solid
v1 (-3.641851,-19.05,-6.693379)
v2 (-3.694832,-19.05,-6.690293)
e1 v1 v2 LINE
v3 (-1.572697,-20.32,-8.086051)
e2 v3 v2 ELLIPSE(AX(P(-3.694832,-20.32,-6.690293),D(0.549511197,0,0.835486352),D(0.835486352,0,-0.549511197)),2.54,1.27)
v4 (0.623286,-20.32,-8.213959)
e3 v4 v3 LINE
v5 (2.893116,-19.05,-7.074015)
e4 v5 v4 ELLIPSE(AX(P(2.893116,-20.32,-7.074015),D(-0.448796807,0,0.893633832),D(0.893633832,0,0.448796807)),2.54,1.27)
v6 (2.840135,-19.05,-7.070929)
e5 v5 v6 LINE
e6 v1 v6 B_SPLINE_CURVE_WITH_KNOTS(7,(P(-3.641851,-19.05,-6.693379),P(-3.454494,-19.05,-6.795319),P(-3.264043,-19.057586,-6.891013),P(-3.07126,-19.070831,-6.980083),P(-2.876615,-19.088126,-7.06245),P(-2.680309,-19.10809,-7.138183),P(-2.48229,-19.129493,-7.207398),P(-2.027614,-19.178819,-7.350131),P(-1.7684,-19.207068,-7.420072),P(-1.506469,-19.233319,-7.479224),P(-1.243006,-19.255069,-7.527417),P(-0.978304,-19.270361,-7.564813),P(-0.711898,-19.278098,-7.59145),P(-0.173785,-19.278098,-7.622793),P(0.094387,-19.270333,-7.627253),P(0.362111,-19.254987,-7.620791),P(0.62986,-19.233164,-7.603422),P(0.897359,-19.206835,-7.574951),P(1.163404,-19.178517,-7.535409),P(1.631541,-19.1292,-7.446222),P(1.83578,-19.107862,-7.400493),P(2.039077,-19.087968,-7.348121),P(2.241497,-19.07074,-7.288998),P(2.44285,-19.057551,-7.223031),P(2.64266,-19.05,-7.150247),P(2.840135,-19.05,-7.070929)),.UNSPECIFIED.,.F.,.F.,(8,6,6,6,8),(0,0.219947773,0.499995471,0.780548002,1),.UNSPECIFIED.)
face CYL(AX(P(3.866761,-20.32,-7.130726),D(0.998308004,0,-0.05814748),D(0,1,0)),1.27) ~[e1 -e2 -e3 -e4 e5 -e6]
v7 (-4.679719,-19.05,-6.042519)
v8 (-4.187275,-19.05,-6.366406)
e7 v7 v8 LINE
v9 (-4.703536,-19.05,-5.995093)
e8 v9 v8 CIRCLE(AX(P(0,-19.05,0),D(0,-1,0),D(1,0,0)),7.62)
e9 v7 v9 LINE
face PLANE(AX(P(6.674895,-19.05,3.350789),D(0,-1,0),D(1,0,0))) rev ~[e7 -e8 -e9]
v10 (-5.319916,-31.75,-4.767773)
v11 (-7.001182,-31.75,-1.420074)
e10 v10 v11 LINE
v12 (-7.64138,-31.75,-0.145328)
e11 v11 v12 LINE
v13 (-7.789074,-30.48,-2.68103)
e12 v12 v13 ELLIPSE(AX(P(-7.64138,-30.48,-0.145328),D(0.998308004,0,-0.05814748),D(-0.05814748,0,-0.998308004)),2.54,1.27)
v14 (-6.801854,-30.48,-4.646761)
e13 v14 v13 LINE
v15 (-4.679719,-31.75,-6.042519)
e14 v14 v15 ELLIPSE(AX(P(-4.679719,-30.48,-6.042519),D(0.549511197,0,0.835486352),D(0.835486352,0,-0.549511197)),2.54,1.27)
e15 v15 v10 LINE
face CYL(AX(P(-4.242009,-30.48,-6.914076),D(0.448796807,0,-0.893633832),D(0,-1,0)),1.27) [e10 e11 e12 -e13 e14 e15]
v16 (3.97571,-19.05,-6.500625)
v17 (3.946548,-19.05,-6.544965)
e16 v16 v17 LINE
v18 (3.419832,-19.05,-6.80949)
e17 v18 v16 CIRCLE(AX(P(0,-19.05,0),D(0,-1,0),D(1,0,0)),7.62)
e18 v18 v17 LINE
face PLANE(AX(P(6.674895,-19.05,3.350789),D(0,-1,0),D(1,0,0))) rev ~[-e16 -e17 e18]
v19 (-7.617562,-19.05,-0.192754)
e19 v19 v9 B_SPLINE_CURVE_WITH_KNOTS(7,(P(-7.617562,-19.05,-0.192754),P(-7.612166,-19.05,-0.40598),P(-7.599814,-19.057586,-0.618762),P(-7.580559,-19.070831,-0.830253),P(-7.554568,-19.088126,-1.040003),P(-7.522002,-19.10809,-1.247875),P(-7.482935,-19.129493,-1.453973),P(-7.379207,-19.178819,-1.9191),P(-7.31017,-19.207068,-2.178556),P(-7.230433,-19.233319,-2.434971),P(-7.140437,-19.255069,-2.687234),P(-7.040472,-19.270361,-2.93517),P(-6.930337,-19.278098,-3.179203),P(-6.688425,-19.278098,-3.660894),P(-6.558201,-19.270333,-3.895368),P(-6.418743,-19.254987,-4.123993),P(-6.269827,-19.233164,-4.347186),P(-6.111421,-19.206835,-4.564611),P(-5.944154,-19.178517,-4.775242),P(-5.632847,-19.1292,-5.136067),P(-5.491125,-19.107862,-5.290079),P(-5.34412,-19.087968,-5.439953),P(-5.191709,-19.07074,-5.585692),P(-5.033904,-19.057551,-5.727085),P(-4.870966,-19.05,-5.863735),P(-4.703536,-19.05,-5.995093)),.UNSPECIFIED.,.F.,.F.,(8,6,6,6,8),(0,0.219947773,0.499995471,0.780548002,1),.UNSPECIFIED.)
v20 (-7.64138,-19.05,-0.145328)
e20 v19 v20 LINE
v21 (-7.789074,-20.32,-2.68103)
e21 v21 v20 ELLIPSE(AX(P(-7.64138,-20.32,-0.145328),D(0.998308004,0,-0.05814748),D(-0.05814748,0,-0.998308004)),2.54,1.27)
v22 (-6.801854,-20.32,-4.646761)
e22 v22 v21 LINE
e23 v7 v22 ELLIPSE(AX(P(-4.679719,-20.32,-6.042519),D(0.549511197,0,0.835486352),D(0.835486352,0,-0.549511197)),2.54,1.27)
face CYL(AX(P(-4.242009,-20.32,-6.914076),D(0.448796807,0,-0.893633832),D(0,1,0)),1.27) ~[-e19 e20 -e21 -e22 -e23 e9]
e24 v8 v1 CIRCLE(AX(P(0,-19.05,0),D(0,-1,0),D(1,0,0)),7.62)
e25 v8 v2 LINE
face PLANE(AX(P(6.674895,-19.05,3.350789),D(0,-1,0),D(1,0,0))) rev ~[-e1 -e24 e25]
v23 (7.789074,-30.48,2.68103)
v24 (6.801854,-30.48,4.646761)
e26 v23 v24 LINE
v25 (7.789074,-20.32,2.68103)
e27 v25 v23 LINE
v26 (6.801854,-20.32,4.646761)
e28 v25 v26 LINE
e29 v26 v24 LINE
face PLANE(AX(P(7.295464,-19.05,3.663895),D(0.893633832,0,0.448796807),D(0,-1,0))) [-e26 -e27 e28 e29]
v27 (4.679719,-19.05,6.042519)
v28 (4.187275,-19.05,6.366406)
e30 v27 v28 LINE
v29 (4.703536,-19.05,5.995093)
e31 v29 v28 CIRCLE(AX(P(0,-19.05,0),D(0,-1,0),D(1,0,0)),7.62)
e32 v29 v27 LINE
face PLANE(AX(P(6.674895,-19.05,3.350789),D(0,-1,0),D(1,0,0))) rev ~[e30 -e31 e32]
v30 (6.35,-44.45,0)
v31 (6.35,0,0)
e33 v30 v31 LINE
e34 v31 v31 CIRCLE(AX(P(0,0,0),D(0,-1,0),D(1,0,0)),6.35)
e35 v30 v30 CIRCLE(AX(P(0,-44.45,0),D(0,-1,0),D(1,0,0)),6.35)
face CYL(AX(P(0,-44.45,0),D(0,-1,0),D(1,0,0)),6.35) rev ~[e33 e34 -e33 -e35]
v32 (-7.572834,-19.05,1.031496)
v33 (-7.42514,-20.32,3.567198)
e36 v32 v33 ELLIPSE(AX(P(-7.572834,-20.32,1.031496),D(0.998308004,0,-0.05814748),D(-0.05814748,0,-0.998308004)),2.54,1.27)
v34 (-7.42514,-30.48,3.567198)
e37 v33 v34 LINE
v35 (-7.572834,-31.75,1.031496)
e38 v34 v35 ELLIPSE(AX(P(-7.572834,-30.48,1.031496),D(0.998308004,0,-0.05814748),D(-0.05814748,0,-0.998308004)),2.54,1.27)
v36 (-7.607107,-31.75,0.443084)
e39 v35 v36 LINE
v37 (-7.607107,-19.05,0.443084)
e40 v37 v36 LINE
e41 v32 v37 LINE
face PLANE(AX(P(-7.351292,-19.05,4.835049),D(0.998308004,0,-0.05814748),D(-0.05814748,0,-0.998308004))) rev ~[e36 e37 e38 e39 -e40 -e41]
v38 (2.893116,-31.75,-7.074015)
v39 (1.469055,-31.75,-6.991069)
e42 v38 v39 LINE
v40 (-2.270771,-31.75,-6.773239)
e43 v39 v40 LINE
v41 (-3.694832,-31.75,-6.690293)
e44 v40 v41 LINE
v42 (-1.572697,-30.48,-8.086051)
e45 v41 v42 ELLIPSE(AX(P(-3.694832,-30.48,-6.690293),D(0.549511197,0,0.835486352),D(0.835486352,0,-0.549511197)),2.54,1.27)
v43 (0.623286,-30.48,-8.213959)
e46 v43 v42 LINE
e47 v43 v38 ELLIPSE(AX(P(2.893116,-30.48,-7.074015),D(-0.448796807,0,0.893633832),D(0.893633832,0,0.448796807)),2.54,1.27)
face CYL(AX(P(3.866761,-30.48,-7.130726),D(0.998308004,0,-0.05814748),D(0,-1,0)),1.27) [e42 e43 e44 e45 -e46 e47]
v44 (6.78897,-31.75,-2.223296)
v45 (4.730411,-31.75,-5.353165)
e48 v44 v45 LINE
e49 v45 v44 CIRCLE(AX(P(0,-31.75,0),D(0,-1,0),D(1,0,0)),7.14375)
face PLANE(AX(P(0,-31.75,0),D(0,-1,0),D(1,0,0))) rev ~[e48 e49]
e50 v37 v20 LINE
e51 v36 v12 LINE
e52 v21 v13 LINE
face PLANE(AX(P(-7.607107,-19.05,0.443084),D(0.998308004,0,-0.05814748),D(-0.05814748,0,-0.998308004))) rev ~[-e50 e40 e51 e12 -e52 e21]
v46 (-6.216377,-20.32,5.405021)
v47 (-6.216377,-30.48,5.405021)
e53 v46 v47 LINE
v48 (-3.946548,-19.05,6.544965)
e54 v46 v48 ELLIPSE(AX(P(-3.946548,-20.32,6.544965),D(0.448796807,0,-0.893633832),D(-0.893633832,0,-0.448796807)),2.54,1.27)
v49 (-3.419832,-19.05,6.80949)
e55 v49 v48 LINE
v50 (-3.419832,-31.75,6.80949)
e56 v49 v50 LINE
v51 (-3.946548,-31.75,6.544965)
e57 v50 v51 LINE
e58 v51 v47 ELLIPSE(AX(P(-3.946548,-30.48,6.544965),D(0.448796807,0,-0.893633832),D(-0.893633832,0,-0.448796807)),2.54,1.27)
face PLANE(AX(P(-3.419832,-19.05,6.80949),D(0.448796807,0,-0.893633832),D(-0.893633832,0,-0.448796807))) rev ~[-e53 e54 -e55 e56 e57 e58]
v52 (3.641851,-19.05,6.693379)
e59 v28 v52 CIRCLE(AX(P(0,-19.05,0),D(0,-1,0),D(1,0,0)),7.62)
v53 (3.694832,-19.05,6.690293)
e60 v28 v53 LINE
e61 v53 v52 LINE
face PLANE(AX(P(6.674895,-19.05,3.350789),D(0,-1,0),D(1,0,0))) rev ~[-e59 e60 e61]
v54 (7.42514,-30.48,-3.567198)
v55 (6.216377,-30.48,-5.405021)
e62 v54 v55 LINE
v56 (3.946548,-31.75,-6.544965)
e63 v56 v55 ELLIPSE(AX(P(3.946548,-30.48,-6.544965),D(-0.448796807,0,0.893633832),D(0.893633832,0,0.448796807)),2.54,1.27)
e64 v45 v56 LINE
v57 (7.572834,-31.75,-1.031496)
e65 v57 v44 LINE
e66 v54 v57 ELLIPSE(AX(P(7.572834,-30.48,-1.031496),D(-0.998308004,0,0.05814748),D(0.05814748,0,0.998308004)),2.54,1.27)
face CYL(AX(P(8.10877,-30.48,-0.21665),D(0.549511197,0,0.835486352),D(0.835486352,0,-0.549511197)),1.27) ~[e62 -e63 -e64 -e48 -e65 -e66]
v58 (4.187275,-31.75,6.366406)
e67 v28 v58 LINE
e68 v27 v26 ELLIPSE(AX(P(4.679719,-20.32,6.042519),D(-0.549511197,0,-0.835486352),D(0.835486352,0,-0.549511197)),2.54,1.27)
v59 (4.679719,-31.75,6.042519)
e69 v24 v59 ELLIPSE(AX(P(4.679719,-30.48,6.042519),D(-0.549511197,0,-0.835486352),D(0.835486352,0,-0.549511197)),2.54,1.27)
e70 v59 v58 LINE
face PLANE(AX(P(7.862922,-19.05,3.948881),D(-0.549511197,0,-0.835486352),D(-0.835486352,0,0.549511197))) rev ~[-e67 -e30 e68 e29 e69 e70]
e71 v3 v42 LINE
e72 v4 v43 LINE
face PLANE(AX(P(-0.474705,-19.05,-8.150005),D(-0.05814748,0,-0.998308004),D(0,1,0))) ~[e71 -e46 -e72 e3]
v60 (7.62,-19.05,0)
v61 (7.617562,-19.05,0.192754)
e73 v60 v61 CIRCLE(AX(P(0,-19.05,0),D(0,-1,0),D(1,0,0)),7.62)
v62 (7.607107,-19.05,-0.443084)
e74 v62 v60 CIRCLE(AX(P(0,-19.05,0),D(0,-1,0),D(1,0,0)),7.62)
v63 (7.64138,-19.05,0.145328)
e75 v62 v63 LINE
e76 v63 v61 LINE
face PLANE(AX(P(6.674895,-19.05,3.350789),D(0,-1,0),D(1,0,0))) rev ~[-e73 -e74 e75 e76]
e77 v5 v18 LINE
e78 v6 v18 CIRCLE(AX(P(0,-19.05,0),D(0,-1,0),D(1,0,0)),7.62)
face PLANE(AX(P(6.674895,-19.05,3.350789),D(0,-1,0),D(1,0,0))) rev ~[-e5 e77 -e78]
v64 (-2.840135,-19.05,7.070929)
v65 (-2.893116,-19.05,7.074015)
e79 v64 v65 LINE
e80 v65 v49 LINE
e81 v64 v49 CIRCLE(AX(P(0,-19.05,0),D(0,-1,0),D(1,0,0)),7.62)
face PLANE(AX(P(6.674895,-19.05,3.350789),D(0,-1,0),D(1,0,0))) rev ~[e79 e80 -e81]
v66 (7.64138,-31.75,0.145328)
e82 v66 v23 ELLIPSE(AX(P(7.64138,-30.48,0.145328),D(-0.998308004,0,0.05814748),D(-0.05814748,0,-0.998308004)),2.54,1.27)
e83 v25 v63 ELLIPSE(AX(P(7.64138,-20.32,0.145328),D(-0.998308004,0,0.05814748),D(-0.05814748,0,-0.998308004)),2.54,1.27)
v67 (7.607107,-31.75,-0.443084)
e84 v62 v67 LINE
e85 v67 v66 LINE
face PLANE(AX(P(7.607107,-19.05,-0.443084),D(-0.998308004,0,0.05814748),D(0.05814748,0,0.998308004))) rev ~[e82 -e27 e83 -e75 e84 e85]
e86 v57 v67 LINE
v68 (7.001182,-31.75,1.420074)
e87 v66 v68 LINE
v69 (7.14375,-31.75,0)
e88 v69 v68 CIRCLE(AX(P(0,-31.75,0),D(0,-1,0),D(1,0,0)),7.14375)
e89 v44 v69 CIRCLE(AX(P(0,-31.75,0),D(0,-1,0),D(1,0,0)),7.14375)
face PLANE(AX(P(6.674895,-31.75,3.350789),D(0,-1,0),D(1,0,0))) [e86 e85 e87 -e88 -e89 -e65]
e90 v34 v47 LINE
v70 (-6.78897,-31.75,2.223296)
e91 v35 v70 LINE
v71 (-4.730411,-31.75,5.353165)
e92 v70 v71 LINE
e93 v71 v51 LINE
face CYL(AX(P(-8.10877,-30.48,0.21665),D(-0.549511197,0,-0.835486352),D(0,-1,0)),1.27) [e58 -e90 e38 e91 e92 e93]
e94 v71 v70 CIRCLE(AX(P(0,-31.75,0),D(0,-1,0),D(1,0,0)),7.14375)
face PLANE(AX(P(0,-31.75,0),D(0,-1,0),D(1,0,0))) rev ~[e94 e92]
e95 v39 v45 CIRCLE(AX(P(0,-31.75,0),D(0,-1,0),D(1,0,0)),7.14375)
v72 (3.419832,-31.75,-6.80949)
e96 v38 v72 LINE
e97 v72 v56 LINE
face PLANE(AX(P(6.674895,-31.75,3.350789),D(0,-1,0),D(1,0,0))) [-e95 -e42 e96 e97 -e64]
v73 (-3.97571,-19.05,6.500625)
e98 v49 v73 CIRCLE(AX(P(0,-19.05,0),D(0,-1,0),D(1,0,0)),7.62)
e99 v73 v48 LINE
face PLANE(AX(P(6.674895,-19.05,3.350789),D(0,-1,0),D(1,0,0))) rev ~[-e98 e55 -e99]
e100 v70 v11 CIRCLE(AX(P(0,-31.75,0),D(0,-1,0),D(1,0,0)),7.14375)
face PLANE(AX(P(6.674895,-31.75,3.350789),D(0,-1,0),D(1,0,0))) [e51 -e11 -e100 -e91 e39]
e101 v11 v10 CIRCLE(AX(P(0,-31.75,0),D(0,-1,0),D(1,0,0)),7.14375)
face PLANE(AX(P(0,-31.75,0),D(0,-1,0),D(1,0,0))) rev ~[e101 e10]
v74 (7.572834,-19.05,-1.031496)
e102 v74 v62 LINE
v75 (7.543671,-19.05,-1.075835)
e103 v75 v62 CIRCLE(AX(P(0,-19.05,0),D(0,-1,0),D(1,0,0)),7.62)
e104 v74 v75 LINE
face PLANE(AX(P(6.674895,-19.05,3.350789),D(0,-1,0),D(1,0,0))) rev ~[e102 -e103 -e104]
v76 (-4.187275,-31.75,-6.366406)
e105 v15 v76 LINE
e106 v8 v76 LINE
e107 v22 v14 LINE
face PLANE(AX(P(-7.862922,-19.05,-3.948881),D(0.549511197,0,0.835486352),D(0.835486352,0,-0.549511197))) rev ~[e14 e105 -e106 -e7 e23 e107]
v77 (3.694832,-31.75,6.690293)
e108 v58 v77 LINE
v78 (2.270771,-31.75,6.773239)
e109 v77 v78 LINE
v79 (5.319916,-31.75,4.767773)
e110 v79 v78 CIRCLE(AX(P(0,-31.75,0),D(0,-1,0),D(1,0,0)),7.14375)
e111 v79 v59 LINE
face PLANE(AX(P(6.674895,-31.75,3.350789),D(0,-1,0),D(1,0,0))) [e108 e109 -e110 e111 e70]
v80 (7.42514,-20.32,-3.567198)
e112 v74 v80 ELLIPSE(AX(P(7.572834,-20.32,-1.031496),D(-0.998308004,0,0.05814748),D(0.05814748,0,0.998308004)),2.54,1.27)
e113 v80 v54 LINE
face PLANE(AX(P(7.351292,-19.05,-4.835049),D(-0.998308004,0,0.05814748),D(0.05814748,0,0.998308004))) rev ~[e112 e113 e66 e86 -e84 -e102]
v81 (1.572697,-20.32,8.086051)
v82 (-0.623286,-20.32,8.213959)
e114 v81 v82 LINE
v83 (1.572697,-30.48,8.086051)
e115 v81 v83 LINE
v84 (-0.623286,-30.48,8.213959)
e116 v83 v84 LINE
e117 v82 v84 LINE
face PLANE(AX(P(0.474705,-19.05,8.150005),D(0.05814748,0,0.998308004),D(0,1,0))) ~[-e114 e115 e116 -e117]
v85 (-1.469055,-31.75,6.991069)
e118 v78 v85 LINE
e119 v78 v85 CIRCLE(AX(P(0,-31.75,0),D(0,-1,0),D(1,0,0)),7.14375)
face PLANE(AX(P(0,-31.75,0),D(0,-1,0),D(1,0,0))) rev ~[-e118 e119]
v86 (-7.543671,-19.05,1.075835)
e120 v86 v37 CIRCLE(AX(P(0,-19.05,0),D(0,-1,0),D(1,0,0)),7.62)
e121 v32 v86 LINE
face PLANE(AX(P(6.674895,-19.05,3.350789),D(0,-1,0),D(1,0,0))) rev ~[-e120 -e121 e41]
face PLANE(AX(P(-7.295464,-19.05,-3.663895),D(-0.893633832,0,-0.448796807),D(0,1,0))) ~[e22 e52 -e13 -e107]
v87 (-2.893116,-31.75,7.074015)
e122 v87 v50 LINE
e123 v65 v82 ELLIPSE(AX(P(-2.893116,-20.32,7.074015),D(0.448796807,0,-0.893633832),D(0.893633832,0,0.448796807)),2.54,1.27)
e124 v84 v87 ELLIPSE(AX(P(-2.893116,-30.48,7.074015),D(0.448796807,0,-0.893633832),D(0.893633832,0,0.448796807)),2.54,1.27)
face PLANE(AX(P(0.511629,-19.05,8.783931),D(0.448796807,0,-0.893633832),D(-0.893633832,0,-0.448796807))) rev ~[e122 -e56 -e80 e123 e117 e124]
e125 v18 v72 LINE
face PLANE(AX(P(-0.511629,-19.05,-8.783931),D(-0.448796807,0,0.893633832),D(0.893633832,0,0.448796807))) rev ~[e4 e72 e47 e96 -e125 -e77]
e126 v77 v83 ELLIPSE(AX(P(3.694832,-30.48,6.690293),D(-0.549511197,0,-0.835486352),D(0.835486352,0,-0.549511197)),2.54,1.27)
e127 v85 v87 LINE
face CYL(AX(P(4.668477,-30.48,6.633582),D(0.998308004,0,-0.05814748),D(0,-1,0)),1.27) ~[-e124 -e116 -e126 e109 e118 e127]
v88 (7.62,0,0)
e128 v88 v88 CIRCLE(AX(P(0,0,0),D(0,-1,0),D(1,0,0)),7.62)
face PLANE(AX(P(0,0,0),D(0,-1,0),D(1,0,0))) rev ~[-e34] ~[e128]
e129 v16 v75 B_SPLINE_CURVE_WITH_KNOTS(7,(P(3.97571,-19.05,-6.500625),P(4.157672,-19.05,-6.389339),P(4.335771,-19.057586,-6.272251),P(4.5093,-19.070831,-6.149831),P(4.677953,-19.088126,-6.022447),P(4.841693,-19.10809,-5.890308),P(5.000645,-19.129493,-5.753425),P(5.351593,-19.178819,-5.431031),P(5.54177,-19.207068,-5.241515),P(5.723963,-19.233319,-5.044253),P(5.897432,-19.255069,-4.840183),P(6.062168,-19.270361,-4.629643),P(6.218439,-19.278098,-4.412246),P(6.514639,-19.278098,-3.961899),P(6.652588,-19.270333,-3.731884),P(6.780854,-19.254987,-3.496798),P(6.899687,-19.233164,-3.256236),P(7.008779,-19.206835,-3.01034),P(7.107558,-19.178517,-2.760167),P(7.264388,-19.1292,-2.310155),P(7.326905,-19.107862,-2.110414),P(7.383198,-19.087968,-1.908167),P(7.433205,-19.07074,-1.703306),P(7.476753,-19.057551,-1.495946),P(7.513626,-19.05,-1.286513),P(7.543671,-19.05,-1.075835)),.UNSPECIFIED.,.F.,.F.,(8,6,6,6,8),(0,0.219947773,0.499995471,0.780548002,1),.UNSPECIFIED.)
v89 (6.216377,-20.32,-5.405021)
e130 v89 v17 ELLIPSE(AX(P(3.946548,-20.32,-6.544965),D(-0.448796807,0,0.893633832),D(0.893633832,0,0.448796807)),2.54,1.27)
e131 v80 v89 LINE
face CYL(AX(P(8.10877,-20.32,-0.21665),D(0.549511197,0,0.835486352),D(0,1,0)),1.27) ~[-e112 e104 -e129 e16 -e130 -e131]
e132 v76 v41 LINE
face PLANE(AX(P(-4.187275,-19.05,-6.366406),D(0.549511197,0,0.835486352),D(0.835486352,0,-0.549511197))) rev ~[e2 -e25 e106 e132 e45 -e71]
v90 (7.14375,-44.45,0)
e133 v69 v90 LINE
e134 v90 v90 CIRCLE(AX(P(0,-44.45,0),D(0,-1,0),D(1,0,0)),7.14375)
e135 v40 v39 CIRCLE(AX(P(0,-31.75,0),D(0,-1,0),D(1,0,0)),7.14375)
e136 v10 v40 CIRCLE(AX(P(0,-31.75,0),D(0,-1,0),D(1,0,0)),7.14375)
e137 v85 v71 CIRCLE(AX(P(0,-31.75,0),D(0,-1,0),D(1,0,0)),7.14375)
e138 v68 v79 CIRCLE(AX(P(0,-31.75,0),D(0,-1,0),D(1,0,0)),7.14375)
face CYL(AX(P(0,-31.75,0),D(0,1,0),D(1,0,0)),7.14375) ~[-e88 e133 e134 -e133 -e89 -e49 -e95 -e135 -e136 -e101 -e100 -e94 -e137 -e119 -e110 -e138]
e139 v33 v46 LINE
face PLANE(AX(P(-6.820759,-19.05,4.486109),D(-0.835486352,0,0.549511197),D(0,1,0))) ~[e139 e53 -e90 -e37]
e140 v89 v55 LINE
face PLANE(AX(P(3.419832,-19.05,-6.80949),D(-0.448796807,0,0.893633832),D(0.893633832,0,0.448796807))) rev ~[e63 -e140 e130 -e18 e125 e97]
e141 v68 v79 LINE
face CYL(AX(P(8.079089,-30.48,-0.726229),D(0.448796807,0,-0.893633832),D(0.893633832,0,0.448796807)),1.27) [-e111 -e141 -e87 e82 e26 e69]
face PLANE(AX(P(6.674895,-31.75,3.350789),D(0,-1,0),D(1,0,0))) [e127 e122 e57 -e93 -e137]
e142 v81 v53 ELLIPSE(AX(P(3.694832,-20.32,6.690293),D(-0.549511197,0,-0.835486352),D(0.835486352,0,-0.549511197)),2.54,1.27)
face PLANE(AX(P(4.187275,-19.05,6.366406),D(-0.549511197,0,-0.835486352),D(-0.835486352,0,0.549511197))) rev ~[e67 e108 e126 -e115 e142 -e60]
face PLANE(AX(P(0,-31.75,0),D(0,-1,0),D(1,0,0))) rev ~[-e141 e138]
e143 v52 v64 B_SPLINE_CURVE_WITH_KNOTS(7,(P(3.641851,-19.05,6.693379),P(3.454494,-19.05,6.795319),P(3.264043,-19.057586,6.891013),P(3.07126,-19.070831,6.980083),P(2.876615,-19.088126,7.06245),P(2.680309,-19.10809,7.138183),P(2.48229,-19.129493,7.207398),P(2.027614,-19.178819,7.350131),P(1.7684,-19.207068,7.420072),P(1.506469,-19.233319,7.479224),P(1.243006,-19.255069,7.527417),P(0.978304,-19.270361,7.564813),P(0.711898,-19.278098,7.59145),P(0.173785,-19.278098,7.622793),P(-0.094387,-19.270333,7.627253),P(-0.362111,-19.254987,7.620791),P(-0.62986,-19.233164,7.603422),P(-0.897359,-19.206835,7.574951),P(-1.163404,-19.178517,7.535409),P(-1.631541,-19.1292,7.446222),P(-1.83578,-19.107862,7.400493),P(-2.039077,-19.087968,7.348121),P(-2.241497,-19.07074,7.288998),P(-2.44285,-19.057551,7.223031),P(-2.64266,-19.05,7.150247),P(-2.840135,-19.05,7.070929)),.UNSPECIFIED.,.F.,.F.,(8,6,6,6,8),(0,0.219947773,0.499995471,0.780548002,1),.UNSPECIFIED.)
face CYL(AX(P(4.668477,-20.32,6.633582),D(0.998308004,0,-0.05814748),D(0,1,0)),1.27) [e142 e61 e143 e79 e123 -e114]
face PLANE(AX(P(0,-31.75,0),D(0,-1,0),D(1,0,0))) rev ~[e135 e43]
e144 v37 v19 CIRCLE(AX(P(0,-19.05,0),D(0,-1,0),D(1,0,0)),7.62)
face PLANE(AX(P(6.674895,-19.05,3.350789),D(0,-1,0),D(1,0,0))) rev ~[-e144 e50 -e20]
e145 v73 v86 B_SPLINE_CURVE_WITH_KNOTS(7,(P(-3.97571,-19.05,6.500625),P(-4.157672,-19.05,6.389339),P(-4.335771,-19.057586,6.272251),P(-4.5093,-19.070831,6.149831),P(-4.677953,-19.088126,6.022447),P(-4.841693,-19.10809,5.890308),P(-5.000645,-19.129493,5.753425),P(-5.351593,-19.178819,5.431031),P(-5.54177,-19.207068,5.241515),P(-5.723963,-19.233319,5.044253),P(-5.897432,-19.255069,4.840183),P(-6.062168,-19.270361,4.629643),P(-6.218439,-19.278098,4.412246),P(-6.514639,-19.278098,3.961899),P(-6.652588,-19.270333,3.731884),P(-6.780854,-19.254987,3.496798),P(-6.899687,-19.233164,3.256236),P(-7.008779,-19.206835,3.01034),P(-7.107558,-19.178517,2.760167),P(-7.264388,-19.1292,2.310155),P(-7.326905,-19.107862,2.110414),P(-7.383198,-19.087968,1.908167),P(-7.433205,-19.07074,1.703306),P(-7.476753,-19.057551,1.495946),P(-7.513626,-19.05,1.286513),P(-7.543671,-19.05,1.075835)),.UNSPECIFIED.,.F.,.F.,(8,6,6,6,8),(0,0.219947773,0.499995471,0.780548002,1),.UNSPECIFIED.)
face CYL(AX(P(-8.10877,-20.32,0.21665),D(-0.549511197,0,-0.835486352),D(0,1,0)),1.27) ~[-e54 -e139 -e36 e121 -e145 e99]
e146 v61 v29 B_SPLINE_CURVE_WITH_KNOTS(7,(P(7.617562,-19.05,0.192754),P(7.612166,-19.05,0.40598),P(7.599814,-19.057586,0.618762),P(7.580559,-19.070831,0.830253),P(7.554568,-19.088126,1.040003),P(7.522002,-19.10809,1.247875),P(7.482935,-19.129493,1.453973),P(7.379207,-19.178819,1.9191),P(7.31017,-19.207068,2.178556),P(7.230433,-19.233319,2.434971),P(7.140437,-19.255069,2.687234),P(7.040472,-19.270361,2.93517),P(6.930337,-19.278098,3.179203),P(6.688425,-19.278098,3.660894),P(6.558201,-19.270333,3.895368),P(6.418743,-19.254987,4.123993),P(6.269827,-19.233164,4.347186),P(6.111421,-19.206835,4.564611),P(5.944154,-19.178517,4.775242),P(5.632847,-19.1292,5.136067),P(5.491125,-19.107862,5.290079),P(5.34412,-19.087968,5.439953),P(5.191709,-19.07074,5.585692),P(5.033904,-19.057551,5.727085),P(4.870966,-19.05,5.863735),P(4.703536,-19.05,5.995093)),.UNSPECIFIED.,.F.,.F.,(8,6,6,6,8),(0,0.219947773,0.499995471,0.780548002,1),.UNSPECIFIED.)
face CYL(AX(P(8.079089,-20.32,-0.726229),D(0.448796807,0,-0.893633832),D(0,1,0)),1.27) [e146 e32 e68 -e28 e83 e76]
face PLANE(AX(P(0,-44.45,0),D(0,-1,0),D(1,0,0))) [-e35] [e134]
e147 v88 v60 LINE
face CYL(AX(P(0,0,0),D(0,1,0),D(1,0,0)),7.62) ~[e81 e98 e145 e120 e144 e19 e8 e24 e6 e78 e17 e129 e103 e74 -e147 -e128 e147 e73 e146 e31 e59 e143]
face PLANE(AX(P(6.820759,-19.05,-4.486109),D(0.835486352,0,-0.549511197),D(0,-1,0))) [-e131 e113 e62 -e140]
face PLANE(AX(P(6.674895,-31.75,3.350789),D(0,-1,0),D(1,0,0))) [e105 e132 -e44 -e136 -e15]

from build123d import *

# Parameters (mm, degrees)
F0_R         = 7.62
F1_DEPTH     = 19.05
F3_DEPTH     = 12.7
F4_SIZE      = 1.27
F5_T1_DEPTH  = 8.5497045256
F5_T3_DEPTH  = 8.5497045256
F5_T5_DEPTH  = 8.5497045256
F5_T7_DEPTH  = 8.5497045256
F5_T12_DEPTH = 8.5497045256
F5_S13_R     = 7.62
F5_T14_DEPTH = 6
F5_T18_DEPTH = 8.5497045256
F5_S19_R     = 7.62
F5_T20_DEPTH = 6
F5_T24_DEPTH = 8.5497045256
F5_S25_R     = 7.62
F5_T26_DEPTH = 6
F5_T30_DEPTH = 8.5497045256
F5_S31_R     = 7.62
F5_T32_DEPTH = 6
F5_T36_DEPTH = 8.5497045256
F5_S37_R     = 7.62
F5_T38_DEPTH = 6
F5_T42_DEPTH = 8.5497045256
F5_S43_R     = 7.62
F5_T44_DEPTH = 6
F6_R         = 7.14375
F7_DEPTH     = 12.7
F8_R         = 6.35
F9_DEPTH     = 44.4510001


# Not quite as in the source:
# - a fillet or chamfer that OpenCascade refuses, or shapes differently, is made with other operations: its cross-section is extruded or revolved along the edge and cut away or added


with BuildPart() as f1:
    # F0 (on Front) → F1 (new body)
    with BuildSketch(Plane.XZ):
        Circle(F0_R)
    extrude(amount=F1_DEPTH)

    # F2 (on face) → F3 (join)
    with BuildSketch(Plane.XZ.offset(19.05)):
        with BuildLine():
            Line((7.8629215405, 3.9488814679), (4.1872753391, 6.3664059904))
            ThreePointArc((4.1872753391, 6.3664059904), (6.7071394083, 3.6164459015), (7.62, 0))
            ThreePointArc((7.62, 0), (7.616776064, -0.2216357159), (7.6071069841, -0.4430838887))
            Line((7.6071069841, -0.4430838887), (7.8629215405, 3.9488814679))
        make_face()
        with BuildLine():
            ThreePointArc((4.1872753391, 6.3664059904), (0.4430838236, 7.6071069879), (-3.4198316443, 6.8094898138))
            ThreePointArc((-3.4198316443, 6.8094898138), (-6.3664059346, 4.187275424), (-7.6071069765, 0.4430840189))
            ThreePointArc((-7.6071069765, 0.4430840189), (-6.8094898664, -3.4198315396), (-4.187275378, -6.3664059648))
            ThreePointArc((-4.187275378, -6.3664059648), (-0.4430838337, -7.6071069873), (3.419831668, -6.8094898019))
            ThreePointArc((3.419831668, -6.8094898019), (6.3664059777, -4.1872753585), (7.6071069841, -0.4430838887))
            ThreePointArc((7.6071069841, -0.4430838887), (7.616776064, -0.2216357159), (7.62, 0))
            ThreePointArc((7.62, 0), (6.7071394083, 3.6164459015), (4.1872753391, 6.3664059904))
        make_face()
        with BuildLine():
            ThreePointArc((7.6071069841, -0.4430838887), (6.3664059777, -4.1872753585), (3.419831668, -6.8094898019))
            Line((3.419831668, -6.8094898019), (7.351292438, -4.8350490681))
            Line((7.351292438, -4.8350490681), (7.6071069841, -0.4430838887))
        make_face()
        with BuildLine():
            ThreePointArc((3.419831668, -6.8094898019), (-0.4430838337, -7.6071069873), (-4.187275378, -6.3664059648))
            Line((-4.187275378, -6.3664059648), (-0.5116291025, -8.783930536))
            Line((-0.5116291025, -8.783930536), (3.419831668, -6.8094898019))
        make_face()
        with BuildLine():
            ThreePointArc((-4.187275378, -6.3664059648), (-6.8094898664, -3.4198315396), (-7.6071069765, 0.4430840189))
            Line((-7.6071069765, 0.4430840189), (-7.8629215405, -3.9488814679))
            Line((-7.8629215405, -3.9488814679), (-4.187275378, -6.3664059648))
        make_face()
        with BuildLine():
            Line((-3.4198316443, 6.8094898138), (-7.351292438, 4.8350490681))
            Line((-7.351292438, 4.8350490681), (-7.6071069765, 0.4430840189))
            ThreePointArc((-7.6071069765, 0.4430840189), (-6.3664059346, 4.187275424), (-3.4198316443, 6.8094898138))
        make_face()
        with BuildLine():
            Line((0.5116291025, 8.783930536), (-3.4198316443, 6.8094898138))
            ThreePointArc((-3.4198316443, 6.8094898138), (0.4430838236, 7.6071069879), (4.1872753391, 6.3664059904))
            Line((4.1872753391, 6.3664059904), (0.5116291025, 8.783930536))
        make_face()
    extrude(amount=F3_DEPTH)

    # F4
    f4_edges = [f1.edges().sort_by_distance(p)[0] for p in [
        (7.862922, -25.4, 3.948881),
        (7.351292, -25.4, -4.835049),
        (-0.511629, -25.4, -8.783931),
        (-7.862922, -25.4, -3.948881),
        (-7.351292, -25.4, 4.835049),
        (0.511629, -25.4, 8.783931),
    ]]
    chamfer(f4_edges, length=F4_SIZE)

    # F5: fillet of radius 1.27 on 12 edges, made by hand

    # F5_s2 → F5_t1 (cut)
    with BuildSketch(Plane(origin=(1.918540045, 0, -3.8201526101), x_dir=(0, 1, 0), z_dir=(-0.4487968068, 0, 0.8936338323))):
        with BuildLine():
            ThreePointArc((-30.48, -8.1638181024), (-31.3780256121, -7.7918437146), (-31.75, -6.8938181024))
            Line((-31.75, -6.8938181024), (-31.75, -8.1638181024))
            Line((-31.75, -8.1638181024), (-30.48, -8.1638181024))
        make_face()
        with BuildLine():
            ThreePointArc((-31.75, 6.8938181024), (-31.3780256121, 7.7918437146), (-30.48, 8.1638181024))
            Line((-30.48, 8.1638181024), (-31.75, 8.1638181024))
            Line((-31.75, 8.1638181024), (-31.75, 6.8938181024))
        make_face()
    extrude(amount=F5_T1_DEPTH, mode=Mode.SUBTRACT)

    # F5_s4 → F5_t3 (cut)
    with BuildSketch(Plane(origin=(4.2676192292, 0, -0.2485718879), x_dir=(0, 1, 0), z_dir=(-0.9983080038, 0, 0.0581474803))):
        with BuildLine():
            ThreePointArc((-31.75, -6.8938181024), (-31.3780256121, -7.7918437146), (-30.48, -8.1638181024))
            Line((-30.48, -8.1638181024), (-31.75, -8.1638181024))
            Line((-31.75, -8.1638181024), (-31.75, -6.8938181024))
        make_face()
        with BuildLine():
            ThreePointArc((-31.75, 6.8938181024), (-31.3780256121, 7.7918437146), (-30.48, 8.1638181024))
            Line((-30.48, 8.1638181024), (-31.75, 8.1638181024))
            Line((-31.75, 8.1638181024), (-31.75, 6.8938181024))
        make_face()
    extrude(amount=F5_T3_DEPTH, mode=Mode.SUBTRACT)

    # F5_s6 → F5_t5 (cut)
    with BuildSketch(Plane(origin=(-2.3490791841, 0, -3.5715807222), x_dir=(0, 1, 0), z_dir=(0.5495111971, 0, 0.835486352))):
        with BuildLine():
            ThreePointArc((-31.75, 6.8938181024), (-31.3780256121, 7.7918437146), (-30.48, 8.1638181024))
            Line((-30.48, 8.1638181024), (-31.75, 8.1638181024))
            Line((-31.75, 8.1638181024), (-31.75, 6.8938181024))
        make_face()
    extrude(amount=F5_T5_DEPTH, mode=Mode.SUBTRACT)

    # F5_s8 → F5_t7 (cut)
    with BuildSketch(Plane(origin=(2.3490791841, 0, 3.5715807222), x_dir=(0, 1, 0), z_dir=(-0.5495111971, 0, -0.835486352))):
        with BuildLine():
            ThreePointArc((-30.48, 8.1638181024), (-31.3780256121, 7.7918437146), (-31.75, 6.8938181024))
            Line((-31.75, 6.8938181024), (-31.75, 8.1638181024))
            Line((-31.75, 8.1638181024), (-30.48, 8.1638181024))
        make_face()
    extrude(amount=F5_T7_DEPTH, mode=Mode.SUBTRACT)


with BuildPart() as f5_tool10:
    # F5_s11 → F5_t12 (new body)
    with BuildSketch(Plane(origin=(4.2676192292, 0, -0.2485718879), x_dir=(0, 1, 0), z_dir=(-0.9983080038, 0, 0.0581474803))):
        with BuildLine():
            ThreePointArc((-19.05, -6.8938181024), (-19.4219743879, -7.7918437146), (-20.32, -8.1638181024))
            Line((-20.32, -8.1638181024), (-19.05, -8.1638181024))
            Line((-19.05, -8.1638181024), (-19.05, -6.8938181024))
        make_face()
    extrude(amount=F5_T12_DEPTH)

    # F5_s13 → F5_t14 (cut, symmetric)
    with BuildSketch(Plane.XZ.offset(19.7)):
        Circle(F5_S13_R)
    extrude(amount=F5_T14_DEPTH, both=True, mode=Mode.SUBTRACT)


with BuildPart() as f1_1:
    add(f1.part)

    # F5_t9: cut F5_tool10
    add(f5_tool10.part, mode=Mode.SUBTRACT)


with BuildPart() as f5_tool16:
    # F5_s17 → F5_t18 (new body)
    with BuildSketch(Plane(origin=(-2.3490791841, 0, -3.5715807222), x_dir=(0, 1, 0), z_dir=(0.5495111971, 0, 0.835486352))):
        with BuildLine():
            ThreePointArc((-19.05, 6.8938181024), (-19.4219743879, 7.7918437146), (-20.32, 8.1638181024))
            Line((-20.32, 8.1638181024), (-19.05, 8.1638181024))
            Line((-19.05, 8.1638181024), (-19.05, 6.8938181024))
        make_face()
    extrude(amount=F5_T18_DEPTH)

    # F5_s19 → F5_t20 (cut, symmetric)
    with BuildSketch(Plane.XZ.offset(19.7)):
        Circle(F5_S19_R)
    extrude(amount=F5_T20_DEPTH, both=True, mode=Mode.SUBTRACT)


with BuildPart() as f1_2:
    add(f1_1.part)

    # F5_t15: cut F5_tool16
    add(f5_tool16.part, mode=Mode.SUBTRACT)


with BuildPart() as f5_tool22:
    # F5_s23 → F5_t24 (new body)
    with BuildSketch(Plane(origin=(1.918540045, 0, -3.8201526101), x_dir=(0, 1, 0), z_dir=(-0.4487968068, 0, 0.8936338323))):
        with BuildLine():
            ThreePointArc((-19.05, 6.8938181024), (-19.4219743879, 7.7918437146), (-20.32, 8.1638181024))
            Line((-20.32, 8.1638181024), (-19.05, 8.1638181024))
            Line((-19.05, 8.1638181024), (-19.05, 6.8938181024))
        make_face()
    extrude(amount=F5_T24_DEPTH)

    # F5_s25 → F5_t26 (cut, symmetric)
    with BuildSketch(Plane.XZ.offset(19.7)):
        Circle(F5_S25_R)
    extrude(amount=F5_T26_DEPTH, both=True, mode=Mode.SUBTRACT)


with BuildPart() as f1_3:
    add(f1_2.part)

    # F5_t21: cut F5_tool22
    add(f5_tool22.part, mode=Mode.SUBTRACT)


with BuildPart() as f5_tool28:
    # F5_s29 → F5_t30 (new body)
    with BuildSketch(Plane(origin=(4.2676192292, 0, -0.2485718879), x_dir=(0, 1, 0), z_dir=(-0.9983080038, 0, 0.0581474803))):
        with BuildLine():
            ThreePointArc((-19.05, 6.8938181024), (-19.4219743879, 7.7918437146), (-20.32, 8.1638181024))
            Line((-20.32, 8.1638181024), (-19.05, 8.1638181024))
            Line((-19.05, 8.1638181024), (-19.05, 6.8938181024))
        make_face()
    extrude(amount=F5_T30_DEPTH)

    # F5_s31 → F5_t32 (cut, symmetric)
    with BuildSketch(Plane.XZ.offset(19.7)):
        Circle(F5_S31_R)
    extrude(amount=F5_T32_DEPTH, both=True, mode=Mode.SUBTRACT)


with BuildPart() as f1_4:
    add(f1_3.part)

    # F5_t27: cut F5_tool28
    add(f5_tool28.part, mode=Mode.SUBTRACT)


with BuildPart() as f5_tool34:
    # F5_s35 → F5_t36 (new body)
    with BuildSketch(Plane(origin=(2.3490791841, 0, 3.5715807222), x_dir=(0, 1, 0), z_dir=(-0.5495111971, 0, -0.835486352))):
        with BuildLine():
            ThreePointArc((-19.05, 6.8938181024), (-19.4219743879, 7.7918437146), (-20.32, 8.1638181024))
            Line((-20.32, 8.1638181024), (-19.05, 8.1638181024))
            Line((-19.05, 8.1638181024), (-19.05, 6.8938181024))
        make_face()
    extrude(amount=F5_T36_DEPTH)

    # F5_s37 → F5_t38 (cut, symmetric)
    with BuildSketch(Plane.XZ.offset(19.7)):
        Circle(F5_S37_R)
    extrude(amount=F5_T38_DEPTH, both=True, mode=Mode.SUBTRACT)


with BuildPart() as f1_5:
    add(f1_4.part)

    # F5_t33: cut F5_tool34
    add(f5_tool34.part, mode=Mode.SUBTRACT)


with BuildPart() as f5_tool40:
    # F5_s41 → F5_t42 (new body)
    with BuildSketch(Plane(origin=(1.918540045, 0, -3.8201526101), x_dir=(0, 1, 0), z_dir=(-0.4487968068, 0, 0.8936338323))):
        with BuildLine():
            ThreePointArc((-19.05, -6.8938181024), (-19.4219743879, -7.7918437146), (-20.32, -8.1638181024))
            Line((-20.32, -8.1638181024), (-19.05, -8.1638181024))
            Line((-19.05, -8.1638181024), (-19.05, -6.8938181024))
        make_face()
    extrude(amount=F5_T42_DEPTH)

    # F5_s43 → F5_t44 (cut, symmetric)
    with BuildSketch(Plane.XZ.offset(19.7)):
        Circle(F5_S43_R)
    extrude(amount=F5_T44_DEPTH, both=True, mode=Mode.SUBTRACT)


with BuildPart() as f1_6:
    add(f1_5.part)

    # F5_t39: cut F5_tool40
    add(f5_tool40.part, mode=Mode.SUBTRACT)

    # F6 (on face) → F7 (join)
    with BuildSketch(Plane.XZ.offset(31.75)):
        Circle(F6_R)
    extrude(amount=F7_DEPTH)

    # F8 (on face) → F9 (cut, through all)
    with BuildSketch(Plane.XZ.offset(44.45)):
        Circle(F8_R)
    extrude(amount=-F9_DEPTH, mode=Mode.SUBTRACT)


solid = f1_6.part
